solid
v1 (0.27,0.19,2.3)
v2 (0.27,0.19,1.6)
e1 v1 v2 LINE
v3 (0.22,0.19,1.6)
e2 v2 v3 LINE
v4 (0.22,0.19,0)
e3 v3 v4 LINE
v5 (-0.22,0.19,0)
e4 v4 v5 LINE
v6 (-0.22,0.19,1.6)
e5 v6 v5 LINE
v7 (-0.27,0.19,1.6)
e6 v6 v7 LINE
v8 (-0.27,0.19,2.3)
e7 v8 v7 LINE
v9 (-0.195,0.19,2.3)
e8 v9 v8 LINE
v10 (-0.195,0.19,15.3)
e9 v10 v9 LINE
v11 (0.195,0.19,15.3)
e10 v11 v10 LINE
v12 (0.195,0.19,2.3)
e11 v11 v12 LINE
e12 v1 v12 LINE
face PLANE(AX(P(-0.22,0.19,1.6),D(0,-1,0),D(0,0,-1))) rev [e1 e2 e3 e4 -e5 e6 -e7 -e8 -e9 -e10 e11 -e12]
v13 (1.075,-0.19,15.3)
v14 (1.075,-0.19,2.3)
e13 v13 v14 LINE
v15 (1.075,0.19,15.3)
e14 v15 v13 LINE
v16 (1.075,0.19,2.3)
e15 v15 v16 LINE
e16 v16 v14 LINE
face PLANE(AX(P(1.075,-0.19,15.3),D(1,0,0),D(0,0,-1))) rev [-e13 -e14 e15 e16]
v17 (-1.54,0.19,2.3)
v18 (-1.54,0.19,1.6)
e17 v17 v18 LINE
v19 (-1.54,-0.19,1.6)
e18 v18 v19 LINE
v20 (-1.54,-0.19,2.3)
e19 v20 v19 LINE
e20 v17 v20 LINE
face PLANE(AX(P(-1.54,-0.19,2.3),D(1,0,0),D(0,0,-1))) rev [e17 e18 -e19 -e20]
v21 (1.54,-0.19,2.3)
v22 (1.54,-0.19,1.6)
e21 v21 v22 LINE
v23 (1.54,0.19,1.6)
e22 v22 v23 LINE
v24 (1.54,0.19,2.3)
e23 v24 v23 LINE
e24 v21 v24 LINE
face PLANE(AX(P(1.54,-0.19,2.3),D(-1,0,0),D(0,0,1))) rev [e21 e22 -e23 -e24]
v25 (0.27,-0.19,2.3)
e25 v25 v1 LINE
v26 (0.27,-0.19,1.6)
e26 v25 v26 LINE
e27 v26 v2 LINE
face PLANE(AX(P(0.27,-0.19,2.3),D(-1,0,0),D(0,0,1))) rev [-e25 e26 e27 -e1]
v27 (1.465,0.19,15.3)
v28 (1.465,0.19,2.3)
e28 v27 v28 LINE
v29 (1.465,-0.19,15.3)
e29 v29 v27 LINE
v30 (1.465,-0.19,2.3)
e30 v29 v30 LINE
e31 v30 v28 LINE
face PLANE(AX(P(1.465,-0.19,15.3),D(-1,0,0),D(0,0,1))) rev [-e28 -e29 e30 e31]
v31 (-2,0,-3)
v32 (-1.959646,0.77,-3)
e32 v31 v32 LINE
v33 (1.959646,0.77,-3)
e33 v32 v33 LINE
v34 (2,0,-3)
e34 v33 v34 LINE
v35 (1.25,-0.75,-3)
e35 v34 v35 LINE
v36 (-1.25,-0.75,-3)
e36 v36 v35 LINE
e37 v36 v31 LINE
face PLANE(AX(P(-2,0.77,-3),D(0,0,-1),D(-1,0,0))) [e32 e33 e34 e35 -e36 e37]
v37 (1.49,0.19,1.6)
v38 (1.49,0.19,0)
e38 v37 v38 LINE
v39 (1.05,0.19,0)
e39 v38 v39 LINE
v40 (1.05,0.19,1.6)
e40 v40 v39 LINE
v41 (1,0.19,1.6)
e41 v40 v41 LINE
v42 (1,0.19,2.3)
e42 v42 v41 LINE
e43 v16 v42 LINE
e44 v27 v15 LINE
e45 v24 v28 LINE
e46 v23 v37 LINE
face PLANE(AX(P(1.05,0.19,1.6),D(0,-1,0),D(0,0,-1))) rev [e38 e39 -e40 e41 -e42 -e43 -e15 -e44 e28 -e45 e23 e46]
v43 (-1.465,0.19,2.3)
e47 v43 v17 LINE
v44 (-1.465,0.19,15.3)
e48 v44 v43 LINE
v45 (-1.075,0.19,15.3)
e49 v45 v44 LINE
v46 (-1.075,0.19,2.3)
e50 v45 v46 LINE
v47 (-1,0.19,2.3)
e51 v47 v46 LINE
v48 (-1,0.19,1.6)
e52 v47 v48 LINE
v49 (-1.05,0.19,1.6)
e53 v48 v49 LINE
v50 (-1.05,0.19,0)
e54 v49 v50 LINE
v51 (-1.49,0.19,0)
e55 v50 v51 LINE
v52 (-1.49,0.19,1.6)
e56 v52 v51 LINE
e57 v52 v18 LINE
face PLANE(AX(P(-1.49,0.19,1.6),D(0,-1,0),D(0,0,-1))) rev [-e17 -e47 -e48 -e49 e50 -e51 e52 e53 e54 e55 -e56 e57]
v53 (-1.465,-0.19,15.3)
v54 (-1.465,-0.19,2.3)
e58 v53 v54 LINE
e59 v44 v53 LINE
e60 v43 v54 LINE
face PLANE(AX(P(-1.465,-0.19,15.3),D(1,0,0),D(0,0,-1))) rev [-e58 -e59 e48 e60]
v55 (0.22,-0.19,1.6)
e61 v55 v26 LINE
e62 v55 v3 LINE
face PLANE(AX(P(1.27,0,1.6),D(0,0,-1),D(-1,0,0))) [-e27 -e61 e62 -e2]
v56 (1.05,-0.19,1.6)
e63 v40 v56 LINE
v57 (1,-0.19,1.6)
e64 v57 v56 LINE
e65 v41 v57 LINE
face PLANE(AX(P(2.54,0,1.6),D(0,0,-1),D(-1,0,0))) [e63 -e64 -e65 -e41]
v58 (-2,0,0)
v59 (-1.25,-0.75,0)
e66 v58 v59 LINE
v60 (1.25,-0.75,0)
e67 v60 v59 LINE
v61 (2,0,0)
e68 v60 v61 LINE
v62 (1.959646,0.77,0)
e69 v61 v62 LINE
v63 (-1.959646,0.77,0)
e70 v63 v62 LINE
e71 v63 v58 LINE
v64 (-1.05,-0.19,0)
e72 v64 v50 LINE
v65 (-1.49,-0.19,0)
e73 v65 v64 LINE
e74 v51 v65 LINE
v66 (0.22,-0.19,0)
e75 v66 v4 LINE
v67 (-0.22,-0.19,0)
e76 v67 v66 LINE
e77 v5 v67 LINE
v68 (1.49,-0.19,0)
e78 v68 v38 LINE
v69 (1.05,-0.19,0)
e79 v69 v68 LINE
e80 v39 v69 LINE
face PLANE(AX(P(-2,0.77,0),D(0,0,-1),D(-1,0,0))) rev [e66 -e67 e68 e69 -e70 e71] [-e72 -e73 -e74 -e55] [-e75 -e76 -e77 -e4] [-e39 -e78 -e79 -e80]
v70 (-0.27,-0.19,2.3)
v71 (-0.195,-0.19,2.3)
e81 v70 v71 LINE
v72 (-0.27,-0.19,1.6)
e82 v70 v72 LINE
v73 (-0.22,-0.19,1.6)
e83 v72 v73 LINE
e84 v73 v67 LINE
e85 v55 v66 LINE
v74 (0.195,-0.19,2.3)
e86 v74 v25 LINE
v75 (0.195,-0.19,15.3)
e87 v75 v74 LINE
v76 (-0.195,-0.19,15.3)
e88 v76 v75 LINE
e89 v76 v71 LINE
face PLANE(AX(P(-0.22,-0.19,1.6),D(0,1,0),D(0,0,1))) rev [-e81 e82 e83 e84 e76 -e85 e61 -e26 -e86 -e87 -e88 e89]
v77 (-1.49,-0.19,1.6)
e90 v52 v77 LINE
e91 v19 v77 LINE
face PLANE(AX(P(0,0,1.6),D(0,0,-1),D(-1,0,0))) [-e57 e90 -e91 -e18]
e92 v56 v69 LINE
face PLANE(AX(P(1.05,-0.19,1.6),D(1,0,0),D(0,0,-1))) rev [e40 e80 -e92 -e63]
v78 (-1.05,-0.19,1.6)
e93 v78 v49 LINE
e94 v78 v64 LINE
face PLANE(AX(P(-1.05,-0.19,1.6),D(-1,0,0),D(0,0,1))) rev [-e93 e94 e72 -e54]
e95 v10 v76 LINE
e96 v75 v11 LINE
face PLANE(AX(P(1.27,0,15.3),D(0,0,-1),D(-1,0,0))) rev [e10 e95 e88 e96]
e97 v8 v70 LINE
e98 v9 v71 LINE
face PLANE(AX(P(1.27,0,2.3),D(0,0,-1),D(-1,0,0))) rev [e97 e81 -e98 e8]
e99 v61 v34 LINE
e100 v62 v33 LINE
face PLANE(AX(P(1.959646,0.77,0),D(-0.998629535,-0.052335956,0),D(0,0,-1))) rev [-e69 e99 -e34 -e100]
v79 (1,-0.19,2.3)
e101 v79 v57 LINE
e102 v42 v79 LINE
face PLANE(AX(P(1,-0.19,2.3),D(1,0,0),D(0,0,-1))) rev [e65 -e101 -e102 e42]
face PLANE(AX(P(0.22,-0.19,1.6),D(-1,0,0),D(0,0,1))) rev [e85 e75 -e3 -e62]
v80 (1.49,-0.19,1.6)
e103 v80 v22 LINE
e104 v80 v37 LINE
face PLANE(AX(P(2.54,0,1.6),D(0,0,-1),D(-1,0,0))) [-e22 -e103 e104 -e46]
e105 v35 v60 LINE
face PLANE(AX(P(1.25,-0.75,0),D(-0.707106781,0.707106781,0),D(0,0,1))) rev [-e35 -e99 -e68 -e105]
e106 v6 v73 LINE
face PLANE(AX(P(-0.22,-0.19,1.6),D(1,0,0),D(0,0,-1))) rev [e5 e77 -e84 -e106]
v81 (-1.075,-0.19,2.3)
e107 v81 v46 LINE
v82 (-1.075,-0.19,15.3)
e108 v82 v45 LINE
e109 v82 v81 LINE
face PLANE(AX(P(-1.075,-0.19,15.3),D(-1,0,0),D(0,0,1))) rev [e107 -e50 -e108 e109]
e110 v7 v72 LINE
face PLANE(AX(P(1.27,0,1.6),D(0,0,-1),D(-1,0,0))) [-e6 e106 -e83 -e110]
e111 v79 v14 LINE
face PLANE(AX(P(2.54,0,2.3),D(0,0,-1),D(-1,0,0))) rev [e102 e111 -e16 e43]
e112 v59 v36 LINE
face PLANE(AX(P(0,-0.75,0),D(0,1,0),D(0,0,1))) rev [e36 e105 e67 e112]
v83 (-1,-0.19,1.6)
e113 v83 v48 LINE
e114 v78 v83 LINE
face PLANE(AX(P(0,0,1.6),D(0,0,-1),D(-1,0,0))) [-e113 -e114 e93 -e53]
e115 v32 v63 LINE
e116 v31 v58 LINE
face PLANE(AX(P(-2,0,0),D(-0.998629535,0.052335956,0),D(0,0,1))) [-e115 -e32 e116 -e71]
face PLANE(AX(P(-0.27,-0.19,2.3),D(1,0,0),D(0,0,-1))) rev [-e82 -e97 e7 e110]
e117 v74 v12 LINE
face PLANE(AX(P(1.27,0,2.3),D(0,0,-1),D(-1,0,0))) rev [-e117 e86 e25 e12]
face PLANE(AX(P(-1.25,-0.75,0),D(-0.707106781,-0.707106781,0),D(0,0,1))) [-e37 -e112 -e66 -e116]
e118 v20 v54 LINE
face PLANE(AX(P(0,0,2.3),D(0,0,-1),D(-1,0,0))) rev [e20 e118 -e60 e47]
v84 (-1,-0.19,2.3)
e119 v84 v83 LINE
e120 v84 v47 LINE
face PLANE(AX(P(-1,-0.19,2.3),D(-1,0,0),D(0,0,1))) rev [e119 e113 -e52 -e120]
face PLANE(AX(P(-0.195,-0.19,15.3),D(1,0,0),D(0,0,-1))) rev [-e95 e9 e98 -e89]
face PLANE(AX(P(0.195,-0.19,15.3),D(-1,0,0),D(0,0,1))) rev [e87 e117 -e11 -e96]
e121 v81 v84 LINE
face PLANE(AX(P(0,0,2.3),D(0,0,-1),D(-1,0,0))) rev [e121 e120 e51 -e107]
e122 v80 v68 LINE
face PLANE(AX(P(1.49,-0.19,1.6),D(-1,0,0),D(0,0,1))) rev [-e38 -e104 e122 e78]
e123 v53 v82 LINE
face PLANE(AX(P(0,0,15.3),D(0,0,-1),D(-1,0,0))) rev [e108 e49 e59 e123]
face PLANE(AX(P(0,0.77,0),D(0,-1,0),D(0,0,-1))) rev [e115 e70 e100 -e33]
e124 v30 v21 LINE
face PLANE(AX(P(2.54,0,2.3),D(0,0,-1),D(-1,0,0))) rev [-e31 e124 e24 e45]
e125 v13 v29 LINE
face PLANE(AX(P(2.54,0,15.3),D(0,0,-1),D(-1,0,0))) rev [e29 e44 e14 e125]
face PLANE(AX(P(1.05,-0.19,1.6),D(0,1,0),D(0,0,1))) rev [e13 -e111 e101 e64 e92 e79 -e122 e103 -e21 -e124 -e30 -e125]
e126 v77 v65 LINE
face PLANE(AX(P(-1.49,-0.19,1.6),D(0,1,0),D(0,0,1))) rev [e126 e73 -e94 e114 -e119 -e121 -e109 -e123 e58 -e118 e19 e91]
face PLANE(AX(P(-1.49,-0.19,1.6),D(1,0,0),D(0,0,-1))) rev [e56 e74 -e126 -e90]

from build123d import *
from OCP.BRepFilletAPI import BRepFilletAPI_MakeChamfer

# Parameters (mm, degrees)
SKETCH1_W           = 4
SKETCH1_H           = 3
BOSS_EXTRUDE1_DEPTH = 0.77
SKETCH3_W           = 4
SKETCH3_H           = 3
BOSS_EXTRUDE2_DEPTH = 0.75
CHAMFER1_SIZE       = 0.75
CHAMFER2_SIZE       = 0.77
CHAMFER2_SIZE_2     = 0.04035399
SKETCH4_W           = 0.44
SKETCH4_H           = 0.38
BOSS_EXTRUDE3_DEPTH = 1.6
SKETCH5_W           = 0.54
SKETCH5_H           = 0.38
BOSS_EXTRUDE4_DEPTH = 0.7
SKETCH6_W           = 0.39
SKETCH6_H           = 0.38
BOSS_EXTRUDE5_DEPTH = 13
LPATTERN1_COUNT     = 3
LPATTERN1_PITCH     = 1.27


with BuildPart() as part:
    # Sketch1 → Boss-Extrude1 (new body)
    with BuildSketch(Plane(origin=(0, 0, 0), x_dir=(1, 0, 0), z_dir=(0, 1, 0))):
        with Locations((0, 1.5)):
            Rectangle(SKETCH1_W, SKETCH1_H)
    extrude(amount=BOSS_EXTRUDE1_DEPTH)

    # Sketch3 → Boss-Extrude2 (add)
    with BuildSketch(Plane.XZ):
        with Locations((0, -1.5)):
            Rectangle(SKETCH3_W, SKETCH3_H)
    extrude(amount=BOSS_EXTRUDE2_DEPTH)

    # Chamfer1
    chamfer1_edges = [part.edges().sort_by_distance(p)[0] for p in [
        (-2, -0.75, -1.5),
        (2, -0.75, -1.5),
    ]]
    chamfer(chamfer1_edges, length=CHAMFER1_SIZE)

    # Chamfer2
    chamfer2_edges_1 = [part.edges().sort_by_distance(p)[0] for p in [
        (-2, 0.77, -1.5),
    ]]
    chamfer2_side_1 = [part.faces().sort_by_distance(p)[0] for p in [
        (-2, 0.76919292, -1.5),
    ]]
    chamfer2_edges_2 = [part.edges().sort_by_distance(p)[0] for p in [
        (2, 0.77, -1.5),
    ]]
    chamfer2_side_2 = [part.faces().sort_by_distance(p)[0] for p in [
        (1.99919292, 0.77, -1.5),
    ]]
    chamfer2 = BRepFilletAPI_MakeChamfer(part.part.solid().wrapped)
    for e in chamfer2_edges_1:
        chamfer2.Add(CHAMFER2_SIZE - 0.0001, CHAMFER2_SIZE_2 - 0.0001, e.wrapped, chamfer2_side_1[0].wrapped)
    for e in chamfer2_edges_2:
        chamfer2.Add(CHAMFER2_SIZE_2 - 0.0001, CHAMFER2_SIZE - 0.0001, e.wrapped, chamfer2_side_2[0].wrapped)
    add(Compound.cast(chamfer2.Shape()), mode=Mode.REPLACE)  # a hair under: the kernel refuses the full size

    # Sketch4 → Boss-Extrude3 (add)
    with BuildSketch(Plane.XY):
        with Locations((-1.27, 0)):
            Rectangle(SKETCH4_W, SKETCH4_H)
    boss_extrude3 = extrude(amount=BOSS_EXTRUDE3_DEPTH)

    # Sketch5 → Boss-Extrude4 (add)
    with BuildSketch(Plane.XY.offset(1.6)):
        with Locations((-1.27, 0)):
            Rectangle(SKETCH5_W, SKETCH5_H)
    boss_extrude4 = extrude(amount=BOSS_EXTRUDE4_DEPTH)

    # Sketch6 → Boss-Extrude5 (add)
    with BuildSketch(Plane.XY.offset(2.3)):
        with Locations((-1.27, 0)):
            Rectangle(SKETCH6_W, SKETCH6_H)
    boss_extrude5 = extrude(amount=BOSS_EXTRUDE5_DEPTH)

    # LPattern1: Boss-Extrude3, Boss-Extrude4, Boss-Extrude5 ×3
    with Locations(*[(i * LPATTERN1_PITCH, 0, 0) for i in range(1, LPATTERN1_COUNT)]):
        add(boss_extrude3)
        add(boss_extrude4)
        add(boss_extrude5)


solid = part.part
